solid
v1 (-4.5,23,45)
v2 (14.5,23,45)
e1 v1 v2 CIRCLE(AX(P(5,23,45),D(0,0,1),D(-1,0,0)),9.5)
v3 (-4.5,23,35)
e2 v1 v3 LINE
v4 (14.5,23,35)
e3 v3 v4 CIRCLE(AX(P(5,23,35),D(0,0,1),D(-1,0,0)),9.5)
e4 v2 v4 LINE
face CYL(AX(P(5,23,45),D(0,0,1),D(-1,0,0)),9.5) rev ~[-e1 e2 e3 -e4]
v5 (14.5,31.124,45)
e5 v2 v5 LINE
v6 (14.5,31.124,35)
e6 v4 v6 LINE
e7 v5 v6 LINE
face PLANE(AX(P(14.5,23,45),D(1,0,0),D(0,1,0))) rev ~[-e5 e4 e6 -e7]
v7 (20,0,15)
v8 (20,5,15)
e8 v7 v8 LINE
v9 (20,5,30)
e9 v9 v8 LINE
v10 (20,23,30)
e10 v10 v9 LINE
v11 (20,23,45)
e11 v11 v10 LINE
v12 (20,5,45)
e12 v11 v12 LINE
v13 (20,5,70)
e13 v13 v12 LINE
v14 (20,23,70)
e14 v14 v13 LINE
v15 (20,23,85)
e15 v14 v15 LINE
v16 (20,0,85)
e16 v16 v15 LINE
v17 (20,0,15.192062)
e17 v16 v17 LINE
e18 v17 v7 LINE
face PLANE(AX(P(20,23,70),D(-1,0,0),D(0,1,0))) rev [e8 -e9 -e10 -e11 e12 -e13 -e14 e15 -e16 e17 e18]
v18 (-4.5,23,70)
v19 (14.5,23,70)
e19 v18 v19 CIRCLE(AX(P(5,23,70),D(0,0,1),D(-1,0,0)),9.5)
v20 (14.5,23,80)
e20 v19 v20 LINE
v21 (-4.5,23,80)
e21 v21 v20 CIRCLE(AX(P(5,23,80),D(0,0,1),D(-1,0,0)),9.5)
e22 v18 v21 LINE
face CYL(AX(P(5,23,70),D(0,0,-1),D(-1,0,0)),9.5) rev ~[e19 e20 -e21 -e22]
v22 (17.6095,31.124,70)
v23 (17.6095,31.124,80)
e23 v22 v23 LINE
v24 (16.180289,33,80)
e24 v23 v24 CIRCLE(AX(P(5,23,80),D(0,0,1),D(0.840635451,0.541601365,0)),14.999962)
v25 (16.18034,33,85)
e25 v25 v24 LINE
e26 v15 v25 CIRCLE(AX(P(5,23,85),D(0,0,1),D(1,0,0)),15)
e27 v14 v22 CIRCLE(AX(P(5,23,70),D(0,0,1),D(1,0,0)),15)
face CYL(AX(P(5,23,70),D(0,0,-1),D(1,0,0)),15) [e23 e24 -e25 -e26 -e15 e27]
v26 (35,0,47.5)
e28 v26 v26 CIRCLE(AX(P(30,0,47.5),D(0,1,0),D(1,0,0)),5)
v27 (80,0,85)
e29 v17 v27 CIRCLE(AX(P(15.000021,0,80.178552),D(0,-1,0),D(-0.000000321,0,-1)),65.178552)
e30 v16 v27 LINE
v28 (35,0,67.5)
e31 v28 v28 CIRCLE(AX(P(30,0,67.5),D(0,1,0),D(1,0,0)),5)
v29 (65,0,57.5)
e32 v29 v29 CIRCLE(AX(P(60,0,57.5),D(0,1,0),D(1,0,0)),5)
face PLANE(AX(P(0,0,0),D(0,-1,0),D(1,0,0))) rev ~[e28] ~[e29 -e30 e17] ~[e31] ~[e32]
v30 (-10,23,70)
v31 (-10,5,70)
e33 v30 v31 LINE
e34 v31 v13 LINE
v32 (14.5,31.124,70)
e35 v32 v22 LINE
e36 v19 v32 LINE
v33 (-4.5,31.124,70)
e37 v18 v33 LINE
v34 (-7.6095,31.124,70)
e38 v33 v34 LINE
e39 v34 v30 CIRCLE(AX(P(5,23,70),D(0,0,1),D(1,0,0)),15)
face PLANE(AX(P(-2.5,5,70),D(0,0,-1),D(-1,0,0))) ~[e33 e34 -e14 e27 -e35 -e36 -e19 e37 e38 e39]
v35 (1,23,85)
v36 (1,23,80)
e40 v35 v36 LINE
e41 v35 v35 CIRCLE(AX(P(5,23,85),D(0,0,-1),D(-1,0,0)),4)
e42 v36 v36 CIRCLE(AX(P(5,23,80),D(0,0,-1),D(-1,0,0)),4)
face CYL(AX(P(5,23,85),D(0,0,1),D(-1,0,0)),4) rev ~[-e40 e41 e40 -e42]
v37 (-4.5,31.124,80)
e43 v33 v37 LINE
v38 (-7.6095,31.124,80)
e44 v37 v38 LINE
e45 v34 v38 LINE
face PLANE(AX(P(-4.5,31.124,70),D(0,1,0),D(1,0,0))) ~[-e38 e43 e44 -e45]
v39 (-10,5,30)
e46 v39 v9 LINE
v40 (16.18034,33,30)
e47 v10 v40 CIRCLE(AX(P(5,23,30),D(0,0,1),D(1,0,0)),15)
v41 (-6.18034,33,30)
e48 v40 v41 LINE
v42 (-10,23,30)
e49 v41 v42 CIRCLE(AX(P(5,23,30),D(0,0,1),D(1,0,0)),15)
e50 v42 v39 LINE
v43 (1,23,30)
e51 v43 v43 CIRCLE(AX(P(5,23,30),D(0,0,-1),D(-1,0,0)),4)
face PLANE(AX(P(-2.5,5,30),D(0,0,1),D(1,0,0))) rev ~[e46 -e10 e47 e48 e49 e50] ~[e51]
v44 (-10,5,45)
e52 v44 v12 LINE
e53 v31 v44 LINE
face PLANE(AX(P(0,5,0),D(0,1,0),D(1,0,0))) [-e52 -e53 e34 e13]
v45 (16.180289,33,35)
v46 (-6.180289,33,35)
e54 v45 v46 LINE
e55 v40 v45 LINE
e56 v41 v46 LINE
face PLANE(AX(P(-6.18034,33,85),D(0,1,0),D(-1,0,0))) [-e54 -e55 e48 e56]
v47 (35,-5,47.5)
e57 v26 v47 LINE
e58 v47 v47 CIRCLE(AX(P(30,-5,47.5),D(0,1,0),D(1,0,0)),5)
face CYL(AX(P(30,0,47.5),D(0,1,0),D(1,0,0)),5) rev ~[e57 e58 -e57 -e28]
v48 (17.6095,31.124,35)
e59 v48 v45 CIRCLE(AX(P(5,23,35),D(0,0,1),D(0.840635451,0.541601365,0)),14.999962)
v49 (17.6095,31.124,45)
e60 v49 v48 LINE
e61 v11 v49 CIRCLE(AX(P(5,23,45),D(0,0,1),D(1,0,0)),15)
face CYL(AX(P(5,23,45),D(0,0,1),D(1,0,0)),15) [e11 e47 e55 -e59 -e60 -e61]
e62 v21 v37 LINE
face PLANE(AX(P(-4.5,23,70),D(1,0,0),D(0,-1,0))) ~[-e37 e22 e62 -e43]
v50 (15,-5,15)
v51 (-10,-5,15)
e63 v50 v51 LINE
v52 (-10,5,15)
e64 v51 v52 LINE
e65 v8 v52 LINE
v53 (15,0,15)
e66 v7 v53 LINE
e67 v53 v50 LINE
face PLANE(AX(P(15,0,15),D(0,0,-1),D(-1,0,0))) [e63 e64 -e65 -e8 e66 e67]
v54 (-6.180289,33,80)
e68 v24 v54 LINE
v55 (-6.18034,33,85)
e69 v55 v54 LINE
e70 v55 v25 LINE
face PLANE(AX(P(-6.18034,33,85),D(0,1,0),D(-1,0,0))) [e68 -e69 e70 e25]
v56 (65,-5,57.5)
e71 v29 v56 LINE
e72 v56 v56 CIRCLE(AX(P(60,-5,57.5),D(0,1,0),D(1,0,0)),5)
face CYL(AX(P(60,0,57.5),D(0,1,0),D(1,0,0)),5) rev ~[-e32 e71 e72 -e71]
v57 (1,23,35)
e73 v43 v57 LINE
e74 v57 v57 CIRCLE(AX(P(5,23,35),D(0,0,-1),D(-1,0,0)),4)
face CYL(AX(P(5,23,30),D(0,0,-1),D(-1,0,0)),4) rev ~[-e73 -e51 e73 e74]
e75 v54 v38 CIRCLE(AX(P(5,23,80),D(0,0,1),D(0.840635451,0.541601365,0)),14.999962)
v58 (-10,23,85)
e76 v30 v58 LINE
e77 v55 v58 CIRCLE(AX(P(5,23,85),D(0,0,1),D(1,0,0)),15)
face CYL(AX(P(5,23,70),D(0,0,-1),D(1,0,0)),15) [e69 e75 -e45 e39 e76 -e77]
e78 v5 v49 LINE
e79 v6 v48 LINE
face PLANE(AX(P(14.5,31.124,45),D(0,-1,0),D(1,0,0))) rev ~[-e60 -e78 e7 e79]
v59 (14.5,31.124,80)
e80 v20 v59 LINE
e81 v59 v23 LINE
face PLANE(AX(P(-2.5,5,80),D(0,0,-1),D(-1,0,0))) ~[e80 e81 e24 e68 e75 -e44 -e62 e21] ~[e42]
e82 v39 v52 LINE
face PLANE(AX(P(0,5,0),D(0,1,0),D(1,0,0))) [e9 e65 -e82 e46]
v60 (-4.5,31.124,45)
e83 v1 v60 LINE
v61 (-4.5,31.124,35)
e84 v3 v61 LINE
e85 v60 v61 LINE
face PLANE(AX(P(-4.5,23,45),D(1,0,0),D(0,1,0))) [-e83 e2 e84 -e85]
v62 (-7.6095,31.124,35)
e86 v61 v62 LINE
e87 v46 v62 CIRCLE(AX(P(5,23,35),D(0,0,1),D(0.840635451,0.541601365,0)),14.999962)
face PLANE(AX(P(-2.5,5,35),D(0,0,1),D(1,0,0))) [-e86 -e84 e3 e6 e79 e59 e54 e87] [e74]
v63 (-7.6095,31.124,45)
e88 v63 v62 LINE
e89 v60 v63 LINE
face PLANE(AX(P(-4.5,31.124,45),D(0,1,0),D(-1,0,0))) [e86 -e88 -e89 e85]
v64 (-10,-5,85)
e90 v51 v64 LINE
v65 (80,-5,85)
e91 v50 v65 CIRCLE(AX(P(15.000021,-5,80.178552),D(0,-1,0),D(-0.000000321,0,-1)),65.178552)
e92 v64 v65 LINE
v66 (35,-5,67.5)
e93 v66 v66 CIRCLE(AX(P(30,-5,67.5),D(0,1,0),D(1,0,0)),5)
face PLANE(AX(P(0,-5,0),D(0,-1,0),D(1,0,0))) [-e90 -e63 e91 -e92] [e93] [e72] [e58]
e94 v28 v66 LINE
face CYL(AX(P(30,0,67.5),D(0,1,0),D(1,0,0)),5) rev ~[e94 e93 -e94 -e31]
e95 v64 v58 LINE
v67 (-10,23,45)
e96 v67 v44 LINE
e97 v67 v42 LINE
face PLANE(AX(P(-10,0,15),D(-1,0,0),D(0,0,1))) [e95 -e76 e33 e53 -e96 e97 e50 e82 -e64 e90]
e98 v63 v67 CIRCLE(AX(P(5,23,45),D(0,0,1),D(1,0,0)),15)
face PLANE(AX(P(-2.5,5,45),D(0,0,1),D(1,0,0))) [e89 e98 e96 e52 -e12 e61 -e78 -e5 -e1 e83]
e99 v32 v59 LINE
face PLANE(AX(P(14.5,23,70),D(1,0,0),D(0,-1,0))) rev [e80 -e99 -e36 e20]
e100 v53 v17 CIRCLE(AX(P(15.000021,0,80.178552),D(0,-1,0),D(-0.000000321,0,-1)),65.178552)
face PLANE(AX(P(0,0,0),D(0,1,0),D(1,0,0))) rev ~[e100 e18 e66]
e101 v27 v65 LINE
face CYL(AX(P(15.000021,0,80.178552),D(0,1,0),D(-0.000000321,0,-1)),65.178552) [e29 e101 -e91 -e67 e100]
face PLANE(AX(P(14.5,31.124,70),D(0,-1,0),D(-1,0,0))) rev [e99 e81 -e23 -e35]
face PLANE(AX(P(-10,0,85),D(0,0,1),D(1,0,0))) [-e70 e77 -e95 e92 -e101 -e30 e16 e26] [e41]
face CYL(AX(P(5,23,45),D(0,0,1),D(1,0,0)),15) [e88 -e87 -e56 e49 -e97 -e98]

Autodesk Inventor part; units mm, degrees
ref_plane "Work Plane12" through (0, 0, 0) normal (0, 1, 0) x (1, 0, 0)
sketch "Sketch2" plane through (0, 0, 0) normal (0, 1, 0) x (1, 0, 0)
  line L0 (-10, -65) -> (-10, -85)
  line L1 (-10, -85) -> (20, -85)
  line L2 (-10, -50) -> (-10, -15)
  line L3 (17.5697, -20.0796) -> (74.4447, -85.0796) construction
  line L4 (80.25, -80) -> (80.25, -36.3042) construction
  line L5 (-10, -65) -> (-10, -50)
  arc A0 (80.25, -80) -> (23.375, -15) centre (15.252, -79.4904) ccw projected
  line L6 (20, -85) -> (20, -15)
  line L7 (20, -85) -> (90, -85) construction
  line L8 (20, -15) -> (-10, -15)
  point P0 (0, -80)
  point P1 (0, 0)
  dimension "d13" = 30
  dimension "d14" = 20
  dimension "d15" = 35
  dimension "d98" = 70
  dimension "d99" = 90
extrude "Extrusion2" add sketch "Sketch2" along normal blind 5
ref_plane "Work Plane7" through (0, 5, 0) normal (0, 1, 0) x (1, 0, 0)
ref_plane "Work Plane6" through (0, 5, 0) normal (0, 1, 0) x (1, 0, 0)
sketch "Sketch7" plane through (0, 5, 0) normal (0, 1, 0) x (1, 0, 0)
  line L0 (-2.5, -32.5) -> (7.5, -32.5) projected
  line L1 (2.5, -32.5) -> (15, -75.625) construction
  line L2 (15, -85) -> (15, -65) projected
  line L3 (-2.5, -45) -> (7.5, -45) projected
  line L4 (2.5, -45) -> (2.5, -70) construction
  line L5 (2.5, -57.5) -> (-13.1217, -57.5) construction
  point P0 (0, 0)
  point P1 (20, -85)
  dimension "d54" = 25
ref_plane "Work Plane8" through (-2.5, 5, 45) normal (0, 0, 1) x (1, 0, 0)
sketch "Sketch8" plane through (-2.5, 5, 45) normal (0, 0, 1) x (1, 0, 0)
  line L0 (-7.5, 0) -> (22.5, 0) projected
  arc A0 (22.5, 18) -> (-7.5, 18) centre (7.5, 18) ccw
  line L1 (-7.5, 18) -> (-7.5, 0)
  line L2 (22.5, 18) -> (22.5, 0)
  point P0 (2.5, -5)
  dimension "d100" = 30
extrude "Extrusion7" add sketch "Sketch8" against normal blind 15
ref_plane "Work Plane9" through (-2.5, 5, 45) normal (0, 0, 1) x (1, 0, 0)
sketch "Sketch9" plane through (-2.5, 5, 45) normal (0, 0, 1) x (1, 0, 0)
  arc A0 (-2, 18) -> (17, 18) centre (7.5, 18) ccw
  line L0 (-2, 18) -> (-2, 26.124)
  line L1 (17, 18) -> (17, 26.124)
  line L2 (22.5, 0) -> (-7.5, 0) construction
  line L3 (7.5, 0) -> (7.5, 18) construction
  arc A1 (22.5, 18) -> (-7.5, 18) centre (7.5, 18) ccw construction
  line L4 (17, 26.124) -> (20.1095, 26.124)
  line L5 (-2, 26.124) -> (-5.1095, 26.124)
  arc A2 (20.1095, 26.124) -> (-5.1095, 26.124) centre (7.5, 18) ccw
  point P0 (2.5, -5)
  dimension "d47" = 19
extrude "Extrusion8" cut sketch "Sketch9" against normal blind 10
ref_plane "Work Plane10" through (2.5, 23, 30) normal (0, 0, -1) x (-1, 0, 0)
sketch "Sketch10" plane through (2.5, 23, 30) normal (0, 0, -1) x (-1, 0, 0)
  line L0 (-5, 0) -> (5, 0) projected
  arc A0 (-12, 0) -> (7, 0) centre (-2.5, 0) ccw projected
  circle A1 centre (-2.5, 0) radius 4
  point P0 (2.5, -23)
  dimension "d103" = 8
extrude "Extrusion9" cut sketch "Sketch10" against normal blind 5
ref_plane "Work Plane2" through (2.5, 5, 57.5) normal (0, 0, 1) x (1, 0, 0)
mirror "Mirror2" about plane through (2.5, 5, 57.5) normal (0, 0, 1) of "Extrusion7", "Extrusion8", "Extrusion9"
ref_plane "Work Plane11" through (2.5, 23, 85) normal (0, 0, 1) x (1, 0, 0)
sketch "Sketch11" plane through (2.5, 23, 85) normal (0, 0, 1) x (1, 0, 0)
  line L0 (-12.5, 20) -> (17.5, 20)
  line L1 (17.5, 20) -> (17.5, 10)
  line L2 (17.5, 10) -> (-12.5, 10)
  line L3 (-12.5, 10) -> (-12.5, 20)
  arc A0 (17.5, 0) -> (-12.5, 0) centre (2.5, 0) ccw projected
  line L4 (-12.5, 20) -> (17.5, 10) construction
  line L5 (17.5, 20) -> (-12.5, 10) construction
  point P0 (-2.5, -23)
  point P1 (2.5, 15)
  dimension "d101" = 30
  dimension "d102" = 10
extrude "Extrusion10" cut sketch "Sketch11" against normal blind 80
ref_plane "Work Plane14" through (0, 0, 0) normal (0, -1, 0) x (1, 0, 0)
sketch "Sketch17" plane through (0, 0, 0) normal (0, -1, 0) x (1, 0, 0)
  line L0 (15, 15) -> (-10, 15) projected
  line L1 (-10, 15) -> (15, 15)
  line L2 (-10, 15) -> (-10, 30) projected
  line L3 (-10, 15) -> (-10, 85)
  line L4 (-10, 85) -> (80, 85)
  arc A0 (15, 15) -> (80, 85) centre (15, 80.1786) ccw
  point P0 (0, 0)
  dimension "d94" = 90
extrude "Extrusion16" add sketch "Sketch17" along normal blind 5
sketch "Sketch18" plane through (0, 0, 0) normal (0, 1, 0) x (1, 0, 0)
  line L0 (20, -70) -> (20, -45) construction
  line L1 (20, -57.5) -> (60, -57.5) construction
  line L2 (20, -57.5) -> (30, -57.5) construction
  line L3 (30, -57.5) -> (30, -37.5) construction
  line L4 (30, -57.5) -> (30, -77.5) construction
  circle A0 centre (30, -67.5) radius 5
  circle A1 centre (30, -47.5) radius 5
  circle A2 centre (60, -57.5) radius 5
  point P0 (0, 0)
  dimension "d104" = 40
  dimension "d105" = 10
  dimension "d106" = 20
  dimension "d107" = 20
  dimension "d108" = 10
  dimension "d109" = 10
  dimension "d110" = 10
extrude "Extrusion17" cut sketch "Sketch18" against normal blind 5
properties part number "beta_plate"
